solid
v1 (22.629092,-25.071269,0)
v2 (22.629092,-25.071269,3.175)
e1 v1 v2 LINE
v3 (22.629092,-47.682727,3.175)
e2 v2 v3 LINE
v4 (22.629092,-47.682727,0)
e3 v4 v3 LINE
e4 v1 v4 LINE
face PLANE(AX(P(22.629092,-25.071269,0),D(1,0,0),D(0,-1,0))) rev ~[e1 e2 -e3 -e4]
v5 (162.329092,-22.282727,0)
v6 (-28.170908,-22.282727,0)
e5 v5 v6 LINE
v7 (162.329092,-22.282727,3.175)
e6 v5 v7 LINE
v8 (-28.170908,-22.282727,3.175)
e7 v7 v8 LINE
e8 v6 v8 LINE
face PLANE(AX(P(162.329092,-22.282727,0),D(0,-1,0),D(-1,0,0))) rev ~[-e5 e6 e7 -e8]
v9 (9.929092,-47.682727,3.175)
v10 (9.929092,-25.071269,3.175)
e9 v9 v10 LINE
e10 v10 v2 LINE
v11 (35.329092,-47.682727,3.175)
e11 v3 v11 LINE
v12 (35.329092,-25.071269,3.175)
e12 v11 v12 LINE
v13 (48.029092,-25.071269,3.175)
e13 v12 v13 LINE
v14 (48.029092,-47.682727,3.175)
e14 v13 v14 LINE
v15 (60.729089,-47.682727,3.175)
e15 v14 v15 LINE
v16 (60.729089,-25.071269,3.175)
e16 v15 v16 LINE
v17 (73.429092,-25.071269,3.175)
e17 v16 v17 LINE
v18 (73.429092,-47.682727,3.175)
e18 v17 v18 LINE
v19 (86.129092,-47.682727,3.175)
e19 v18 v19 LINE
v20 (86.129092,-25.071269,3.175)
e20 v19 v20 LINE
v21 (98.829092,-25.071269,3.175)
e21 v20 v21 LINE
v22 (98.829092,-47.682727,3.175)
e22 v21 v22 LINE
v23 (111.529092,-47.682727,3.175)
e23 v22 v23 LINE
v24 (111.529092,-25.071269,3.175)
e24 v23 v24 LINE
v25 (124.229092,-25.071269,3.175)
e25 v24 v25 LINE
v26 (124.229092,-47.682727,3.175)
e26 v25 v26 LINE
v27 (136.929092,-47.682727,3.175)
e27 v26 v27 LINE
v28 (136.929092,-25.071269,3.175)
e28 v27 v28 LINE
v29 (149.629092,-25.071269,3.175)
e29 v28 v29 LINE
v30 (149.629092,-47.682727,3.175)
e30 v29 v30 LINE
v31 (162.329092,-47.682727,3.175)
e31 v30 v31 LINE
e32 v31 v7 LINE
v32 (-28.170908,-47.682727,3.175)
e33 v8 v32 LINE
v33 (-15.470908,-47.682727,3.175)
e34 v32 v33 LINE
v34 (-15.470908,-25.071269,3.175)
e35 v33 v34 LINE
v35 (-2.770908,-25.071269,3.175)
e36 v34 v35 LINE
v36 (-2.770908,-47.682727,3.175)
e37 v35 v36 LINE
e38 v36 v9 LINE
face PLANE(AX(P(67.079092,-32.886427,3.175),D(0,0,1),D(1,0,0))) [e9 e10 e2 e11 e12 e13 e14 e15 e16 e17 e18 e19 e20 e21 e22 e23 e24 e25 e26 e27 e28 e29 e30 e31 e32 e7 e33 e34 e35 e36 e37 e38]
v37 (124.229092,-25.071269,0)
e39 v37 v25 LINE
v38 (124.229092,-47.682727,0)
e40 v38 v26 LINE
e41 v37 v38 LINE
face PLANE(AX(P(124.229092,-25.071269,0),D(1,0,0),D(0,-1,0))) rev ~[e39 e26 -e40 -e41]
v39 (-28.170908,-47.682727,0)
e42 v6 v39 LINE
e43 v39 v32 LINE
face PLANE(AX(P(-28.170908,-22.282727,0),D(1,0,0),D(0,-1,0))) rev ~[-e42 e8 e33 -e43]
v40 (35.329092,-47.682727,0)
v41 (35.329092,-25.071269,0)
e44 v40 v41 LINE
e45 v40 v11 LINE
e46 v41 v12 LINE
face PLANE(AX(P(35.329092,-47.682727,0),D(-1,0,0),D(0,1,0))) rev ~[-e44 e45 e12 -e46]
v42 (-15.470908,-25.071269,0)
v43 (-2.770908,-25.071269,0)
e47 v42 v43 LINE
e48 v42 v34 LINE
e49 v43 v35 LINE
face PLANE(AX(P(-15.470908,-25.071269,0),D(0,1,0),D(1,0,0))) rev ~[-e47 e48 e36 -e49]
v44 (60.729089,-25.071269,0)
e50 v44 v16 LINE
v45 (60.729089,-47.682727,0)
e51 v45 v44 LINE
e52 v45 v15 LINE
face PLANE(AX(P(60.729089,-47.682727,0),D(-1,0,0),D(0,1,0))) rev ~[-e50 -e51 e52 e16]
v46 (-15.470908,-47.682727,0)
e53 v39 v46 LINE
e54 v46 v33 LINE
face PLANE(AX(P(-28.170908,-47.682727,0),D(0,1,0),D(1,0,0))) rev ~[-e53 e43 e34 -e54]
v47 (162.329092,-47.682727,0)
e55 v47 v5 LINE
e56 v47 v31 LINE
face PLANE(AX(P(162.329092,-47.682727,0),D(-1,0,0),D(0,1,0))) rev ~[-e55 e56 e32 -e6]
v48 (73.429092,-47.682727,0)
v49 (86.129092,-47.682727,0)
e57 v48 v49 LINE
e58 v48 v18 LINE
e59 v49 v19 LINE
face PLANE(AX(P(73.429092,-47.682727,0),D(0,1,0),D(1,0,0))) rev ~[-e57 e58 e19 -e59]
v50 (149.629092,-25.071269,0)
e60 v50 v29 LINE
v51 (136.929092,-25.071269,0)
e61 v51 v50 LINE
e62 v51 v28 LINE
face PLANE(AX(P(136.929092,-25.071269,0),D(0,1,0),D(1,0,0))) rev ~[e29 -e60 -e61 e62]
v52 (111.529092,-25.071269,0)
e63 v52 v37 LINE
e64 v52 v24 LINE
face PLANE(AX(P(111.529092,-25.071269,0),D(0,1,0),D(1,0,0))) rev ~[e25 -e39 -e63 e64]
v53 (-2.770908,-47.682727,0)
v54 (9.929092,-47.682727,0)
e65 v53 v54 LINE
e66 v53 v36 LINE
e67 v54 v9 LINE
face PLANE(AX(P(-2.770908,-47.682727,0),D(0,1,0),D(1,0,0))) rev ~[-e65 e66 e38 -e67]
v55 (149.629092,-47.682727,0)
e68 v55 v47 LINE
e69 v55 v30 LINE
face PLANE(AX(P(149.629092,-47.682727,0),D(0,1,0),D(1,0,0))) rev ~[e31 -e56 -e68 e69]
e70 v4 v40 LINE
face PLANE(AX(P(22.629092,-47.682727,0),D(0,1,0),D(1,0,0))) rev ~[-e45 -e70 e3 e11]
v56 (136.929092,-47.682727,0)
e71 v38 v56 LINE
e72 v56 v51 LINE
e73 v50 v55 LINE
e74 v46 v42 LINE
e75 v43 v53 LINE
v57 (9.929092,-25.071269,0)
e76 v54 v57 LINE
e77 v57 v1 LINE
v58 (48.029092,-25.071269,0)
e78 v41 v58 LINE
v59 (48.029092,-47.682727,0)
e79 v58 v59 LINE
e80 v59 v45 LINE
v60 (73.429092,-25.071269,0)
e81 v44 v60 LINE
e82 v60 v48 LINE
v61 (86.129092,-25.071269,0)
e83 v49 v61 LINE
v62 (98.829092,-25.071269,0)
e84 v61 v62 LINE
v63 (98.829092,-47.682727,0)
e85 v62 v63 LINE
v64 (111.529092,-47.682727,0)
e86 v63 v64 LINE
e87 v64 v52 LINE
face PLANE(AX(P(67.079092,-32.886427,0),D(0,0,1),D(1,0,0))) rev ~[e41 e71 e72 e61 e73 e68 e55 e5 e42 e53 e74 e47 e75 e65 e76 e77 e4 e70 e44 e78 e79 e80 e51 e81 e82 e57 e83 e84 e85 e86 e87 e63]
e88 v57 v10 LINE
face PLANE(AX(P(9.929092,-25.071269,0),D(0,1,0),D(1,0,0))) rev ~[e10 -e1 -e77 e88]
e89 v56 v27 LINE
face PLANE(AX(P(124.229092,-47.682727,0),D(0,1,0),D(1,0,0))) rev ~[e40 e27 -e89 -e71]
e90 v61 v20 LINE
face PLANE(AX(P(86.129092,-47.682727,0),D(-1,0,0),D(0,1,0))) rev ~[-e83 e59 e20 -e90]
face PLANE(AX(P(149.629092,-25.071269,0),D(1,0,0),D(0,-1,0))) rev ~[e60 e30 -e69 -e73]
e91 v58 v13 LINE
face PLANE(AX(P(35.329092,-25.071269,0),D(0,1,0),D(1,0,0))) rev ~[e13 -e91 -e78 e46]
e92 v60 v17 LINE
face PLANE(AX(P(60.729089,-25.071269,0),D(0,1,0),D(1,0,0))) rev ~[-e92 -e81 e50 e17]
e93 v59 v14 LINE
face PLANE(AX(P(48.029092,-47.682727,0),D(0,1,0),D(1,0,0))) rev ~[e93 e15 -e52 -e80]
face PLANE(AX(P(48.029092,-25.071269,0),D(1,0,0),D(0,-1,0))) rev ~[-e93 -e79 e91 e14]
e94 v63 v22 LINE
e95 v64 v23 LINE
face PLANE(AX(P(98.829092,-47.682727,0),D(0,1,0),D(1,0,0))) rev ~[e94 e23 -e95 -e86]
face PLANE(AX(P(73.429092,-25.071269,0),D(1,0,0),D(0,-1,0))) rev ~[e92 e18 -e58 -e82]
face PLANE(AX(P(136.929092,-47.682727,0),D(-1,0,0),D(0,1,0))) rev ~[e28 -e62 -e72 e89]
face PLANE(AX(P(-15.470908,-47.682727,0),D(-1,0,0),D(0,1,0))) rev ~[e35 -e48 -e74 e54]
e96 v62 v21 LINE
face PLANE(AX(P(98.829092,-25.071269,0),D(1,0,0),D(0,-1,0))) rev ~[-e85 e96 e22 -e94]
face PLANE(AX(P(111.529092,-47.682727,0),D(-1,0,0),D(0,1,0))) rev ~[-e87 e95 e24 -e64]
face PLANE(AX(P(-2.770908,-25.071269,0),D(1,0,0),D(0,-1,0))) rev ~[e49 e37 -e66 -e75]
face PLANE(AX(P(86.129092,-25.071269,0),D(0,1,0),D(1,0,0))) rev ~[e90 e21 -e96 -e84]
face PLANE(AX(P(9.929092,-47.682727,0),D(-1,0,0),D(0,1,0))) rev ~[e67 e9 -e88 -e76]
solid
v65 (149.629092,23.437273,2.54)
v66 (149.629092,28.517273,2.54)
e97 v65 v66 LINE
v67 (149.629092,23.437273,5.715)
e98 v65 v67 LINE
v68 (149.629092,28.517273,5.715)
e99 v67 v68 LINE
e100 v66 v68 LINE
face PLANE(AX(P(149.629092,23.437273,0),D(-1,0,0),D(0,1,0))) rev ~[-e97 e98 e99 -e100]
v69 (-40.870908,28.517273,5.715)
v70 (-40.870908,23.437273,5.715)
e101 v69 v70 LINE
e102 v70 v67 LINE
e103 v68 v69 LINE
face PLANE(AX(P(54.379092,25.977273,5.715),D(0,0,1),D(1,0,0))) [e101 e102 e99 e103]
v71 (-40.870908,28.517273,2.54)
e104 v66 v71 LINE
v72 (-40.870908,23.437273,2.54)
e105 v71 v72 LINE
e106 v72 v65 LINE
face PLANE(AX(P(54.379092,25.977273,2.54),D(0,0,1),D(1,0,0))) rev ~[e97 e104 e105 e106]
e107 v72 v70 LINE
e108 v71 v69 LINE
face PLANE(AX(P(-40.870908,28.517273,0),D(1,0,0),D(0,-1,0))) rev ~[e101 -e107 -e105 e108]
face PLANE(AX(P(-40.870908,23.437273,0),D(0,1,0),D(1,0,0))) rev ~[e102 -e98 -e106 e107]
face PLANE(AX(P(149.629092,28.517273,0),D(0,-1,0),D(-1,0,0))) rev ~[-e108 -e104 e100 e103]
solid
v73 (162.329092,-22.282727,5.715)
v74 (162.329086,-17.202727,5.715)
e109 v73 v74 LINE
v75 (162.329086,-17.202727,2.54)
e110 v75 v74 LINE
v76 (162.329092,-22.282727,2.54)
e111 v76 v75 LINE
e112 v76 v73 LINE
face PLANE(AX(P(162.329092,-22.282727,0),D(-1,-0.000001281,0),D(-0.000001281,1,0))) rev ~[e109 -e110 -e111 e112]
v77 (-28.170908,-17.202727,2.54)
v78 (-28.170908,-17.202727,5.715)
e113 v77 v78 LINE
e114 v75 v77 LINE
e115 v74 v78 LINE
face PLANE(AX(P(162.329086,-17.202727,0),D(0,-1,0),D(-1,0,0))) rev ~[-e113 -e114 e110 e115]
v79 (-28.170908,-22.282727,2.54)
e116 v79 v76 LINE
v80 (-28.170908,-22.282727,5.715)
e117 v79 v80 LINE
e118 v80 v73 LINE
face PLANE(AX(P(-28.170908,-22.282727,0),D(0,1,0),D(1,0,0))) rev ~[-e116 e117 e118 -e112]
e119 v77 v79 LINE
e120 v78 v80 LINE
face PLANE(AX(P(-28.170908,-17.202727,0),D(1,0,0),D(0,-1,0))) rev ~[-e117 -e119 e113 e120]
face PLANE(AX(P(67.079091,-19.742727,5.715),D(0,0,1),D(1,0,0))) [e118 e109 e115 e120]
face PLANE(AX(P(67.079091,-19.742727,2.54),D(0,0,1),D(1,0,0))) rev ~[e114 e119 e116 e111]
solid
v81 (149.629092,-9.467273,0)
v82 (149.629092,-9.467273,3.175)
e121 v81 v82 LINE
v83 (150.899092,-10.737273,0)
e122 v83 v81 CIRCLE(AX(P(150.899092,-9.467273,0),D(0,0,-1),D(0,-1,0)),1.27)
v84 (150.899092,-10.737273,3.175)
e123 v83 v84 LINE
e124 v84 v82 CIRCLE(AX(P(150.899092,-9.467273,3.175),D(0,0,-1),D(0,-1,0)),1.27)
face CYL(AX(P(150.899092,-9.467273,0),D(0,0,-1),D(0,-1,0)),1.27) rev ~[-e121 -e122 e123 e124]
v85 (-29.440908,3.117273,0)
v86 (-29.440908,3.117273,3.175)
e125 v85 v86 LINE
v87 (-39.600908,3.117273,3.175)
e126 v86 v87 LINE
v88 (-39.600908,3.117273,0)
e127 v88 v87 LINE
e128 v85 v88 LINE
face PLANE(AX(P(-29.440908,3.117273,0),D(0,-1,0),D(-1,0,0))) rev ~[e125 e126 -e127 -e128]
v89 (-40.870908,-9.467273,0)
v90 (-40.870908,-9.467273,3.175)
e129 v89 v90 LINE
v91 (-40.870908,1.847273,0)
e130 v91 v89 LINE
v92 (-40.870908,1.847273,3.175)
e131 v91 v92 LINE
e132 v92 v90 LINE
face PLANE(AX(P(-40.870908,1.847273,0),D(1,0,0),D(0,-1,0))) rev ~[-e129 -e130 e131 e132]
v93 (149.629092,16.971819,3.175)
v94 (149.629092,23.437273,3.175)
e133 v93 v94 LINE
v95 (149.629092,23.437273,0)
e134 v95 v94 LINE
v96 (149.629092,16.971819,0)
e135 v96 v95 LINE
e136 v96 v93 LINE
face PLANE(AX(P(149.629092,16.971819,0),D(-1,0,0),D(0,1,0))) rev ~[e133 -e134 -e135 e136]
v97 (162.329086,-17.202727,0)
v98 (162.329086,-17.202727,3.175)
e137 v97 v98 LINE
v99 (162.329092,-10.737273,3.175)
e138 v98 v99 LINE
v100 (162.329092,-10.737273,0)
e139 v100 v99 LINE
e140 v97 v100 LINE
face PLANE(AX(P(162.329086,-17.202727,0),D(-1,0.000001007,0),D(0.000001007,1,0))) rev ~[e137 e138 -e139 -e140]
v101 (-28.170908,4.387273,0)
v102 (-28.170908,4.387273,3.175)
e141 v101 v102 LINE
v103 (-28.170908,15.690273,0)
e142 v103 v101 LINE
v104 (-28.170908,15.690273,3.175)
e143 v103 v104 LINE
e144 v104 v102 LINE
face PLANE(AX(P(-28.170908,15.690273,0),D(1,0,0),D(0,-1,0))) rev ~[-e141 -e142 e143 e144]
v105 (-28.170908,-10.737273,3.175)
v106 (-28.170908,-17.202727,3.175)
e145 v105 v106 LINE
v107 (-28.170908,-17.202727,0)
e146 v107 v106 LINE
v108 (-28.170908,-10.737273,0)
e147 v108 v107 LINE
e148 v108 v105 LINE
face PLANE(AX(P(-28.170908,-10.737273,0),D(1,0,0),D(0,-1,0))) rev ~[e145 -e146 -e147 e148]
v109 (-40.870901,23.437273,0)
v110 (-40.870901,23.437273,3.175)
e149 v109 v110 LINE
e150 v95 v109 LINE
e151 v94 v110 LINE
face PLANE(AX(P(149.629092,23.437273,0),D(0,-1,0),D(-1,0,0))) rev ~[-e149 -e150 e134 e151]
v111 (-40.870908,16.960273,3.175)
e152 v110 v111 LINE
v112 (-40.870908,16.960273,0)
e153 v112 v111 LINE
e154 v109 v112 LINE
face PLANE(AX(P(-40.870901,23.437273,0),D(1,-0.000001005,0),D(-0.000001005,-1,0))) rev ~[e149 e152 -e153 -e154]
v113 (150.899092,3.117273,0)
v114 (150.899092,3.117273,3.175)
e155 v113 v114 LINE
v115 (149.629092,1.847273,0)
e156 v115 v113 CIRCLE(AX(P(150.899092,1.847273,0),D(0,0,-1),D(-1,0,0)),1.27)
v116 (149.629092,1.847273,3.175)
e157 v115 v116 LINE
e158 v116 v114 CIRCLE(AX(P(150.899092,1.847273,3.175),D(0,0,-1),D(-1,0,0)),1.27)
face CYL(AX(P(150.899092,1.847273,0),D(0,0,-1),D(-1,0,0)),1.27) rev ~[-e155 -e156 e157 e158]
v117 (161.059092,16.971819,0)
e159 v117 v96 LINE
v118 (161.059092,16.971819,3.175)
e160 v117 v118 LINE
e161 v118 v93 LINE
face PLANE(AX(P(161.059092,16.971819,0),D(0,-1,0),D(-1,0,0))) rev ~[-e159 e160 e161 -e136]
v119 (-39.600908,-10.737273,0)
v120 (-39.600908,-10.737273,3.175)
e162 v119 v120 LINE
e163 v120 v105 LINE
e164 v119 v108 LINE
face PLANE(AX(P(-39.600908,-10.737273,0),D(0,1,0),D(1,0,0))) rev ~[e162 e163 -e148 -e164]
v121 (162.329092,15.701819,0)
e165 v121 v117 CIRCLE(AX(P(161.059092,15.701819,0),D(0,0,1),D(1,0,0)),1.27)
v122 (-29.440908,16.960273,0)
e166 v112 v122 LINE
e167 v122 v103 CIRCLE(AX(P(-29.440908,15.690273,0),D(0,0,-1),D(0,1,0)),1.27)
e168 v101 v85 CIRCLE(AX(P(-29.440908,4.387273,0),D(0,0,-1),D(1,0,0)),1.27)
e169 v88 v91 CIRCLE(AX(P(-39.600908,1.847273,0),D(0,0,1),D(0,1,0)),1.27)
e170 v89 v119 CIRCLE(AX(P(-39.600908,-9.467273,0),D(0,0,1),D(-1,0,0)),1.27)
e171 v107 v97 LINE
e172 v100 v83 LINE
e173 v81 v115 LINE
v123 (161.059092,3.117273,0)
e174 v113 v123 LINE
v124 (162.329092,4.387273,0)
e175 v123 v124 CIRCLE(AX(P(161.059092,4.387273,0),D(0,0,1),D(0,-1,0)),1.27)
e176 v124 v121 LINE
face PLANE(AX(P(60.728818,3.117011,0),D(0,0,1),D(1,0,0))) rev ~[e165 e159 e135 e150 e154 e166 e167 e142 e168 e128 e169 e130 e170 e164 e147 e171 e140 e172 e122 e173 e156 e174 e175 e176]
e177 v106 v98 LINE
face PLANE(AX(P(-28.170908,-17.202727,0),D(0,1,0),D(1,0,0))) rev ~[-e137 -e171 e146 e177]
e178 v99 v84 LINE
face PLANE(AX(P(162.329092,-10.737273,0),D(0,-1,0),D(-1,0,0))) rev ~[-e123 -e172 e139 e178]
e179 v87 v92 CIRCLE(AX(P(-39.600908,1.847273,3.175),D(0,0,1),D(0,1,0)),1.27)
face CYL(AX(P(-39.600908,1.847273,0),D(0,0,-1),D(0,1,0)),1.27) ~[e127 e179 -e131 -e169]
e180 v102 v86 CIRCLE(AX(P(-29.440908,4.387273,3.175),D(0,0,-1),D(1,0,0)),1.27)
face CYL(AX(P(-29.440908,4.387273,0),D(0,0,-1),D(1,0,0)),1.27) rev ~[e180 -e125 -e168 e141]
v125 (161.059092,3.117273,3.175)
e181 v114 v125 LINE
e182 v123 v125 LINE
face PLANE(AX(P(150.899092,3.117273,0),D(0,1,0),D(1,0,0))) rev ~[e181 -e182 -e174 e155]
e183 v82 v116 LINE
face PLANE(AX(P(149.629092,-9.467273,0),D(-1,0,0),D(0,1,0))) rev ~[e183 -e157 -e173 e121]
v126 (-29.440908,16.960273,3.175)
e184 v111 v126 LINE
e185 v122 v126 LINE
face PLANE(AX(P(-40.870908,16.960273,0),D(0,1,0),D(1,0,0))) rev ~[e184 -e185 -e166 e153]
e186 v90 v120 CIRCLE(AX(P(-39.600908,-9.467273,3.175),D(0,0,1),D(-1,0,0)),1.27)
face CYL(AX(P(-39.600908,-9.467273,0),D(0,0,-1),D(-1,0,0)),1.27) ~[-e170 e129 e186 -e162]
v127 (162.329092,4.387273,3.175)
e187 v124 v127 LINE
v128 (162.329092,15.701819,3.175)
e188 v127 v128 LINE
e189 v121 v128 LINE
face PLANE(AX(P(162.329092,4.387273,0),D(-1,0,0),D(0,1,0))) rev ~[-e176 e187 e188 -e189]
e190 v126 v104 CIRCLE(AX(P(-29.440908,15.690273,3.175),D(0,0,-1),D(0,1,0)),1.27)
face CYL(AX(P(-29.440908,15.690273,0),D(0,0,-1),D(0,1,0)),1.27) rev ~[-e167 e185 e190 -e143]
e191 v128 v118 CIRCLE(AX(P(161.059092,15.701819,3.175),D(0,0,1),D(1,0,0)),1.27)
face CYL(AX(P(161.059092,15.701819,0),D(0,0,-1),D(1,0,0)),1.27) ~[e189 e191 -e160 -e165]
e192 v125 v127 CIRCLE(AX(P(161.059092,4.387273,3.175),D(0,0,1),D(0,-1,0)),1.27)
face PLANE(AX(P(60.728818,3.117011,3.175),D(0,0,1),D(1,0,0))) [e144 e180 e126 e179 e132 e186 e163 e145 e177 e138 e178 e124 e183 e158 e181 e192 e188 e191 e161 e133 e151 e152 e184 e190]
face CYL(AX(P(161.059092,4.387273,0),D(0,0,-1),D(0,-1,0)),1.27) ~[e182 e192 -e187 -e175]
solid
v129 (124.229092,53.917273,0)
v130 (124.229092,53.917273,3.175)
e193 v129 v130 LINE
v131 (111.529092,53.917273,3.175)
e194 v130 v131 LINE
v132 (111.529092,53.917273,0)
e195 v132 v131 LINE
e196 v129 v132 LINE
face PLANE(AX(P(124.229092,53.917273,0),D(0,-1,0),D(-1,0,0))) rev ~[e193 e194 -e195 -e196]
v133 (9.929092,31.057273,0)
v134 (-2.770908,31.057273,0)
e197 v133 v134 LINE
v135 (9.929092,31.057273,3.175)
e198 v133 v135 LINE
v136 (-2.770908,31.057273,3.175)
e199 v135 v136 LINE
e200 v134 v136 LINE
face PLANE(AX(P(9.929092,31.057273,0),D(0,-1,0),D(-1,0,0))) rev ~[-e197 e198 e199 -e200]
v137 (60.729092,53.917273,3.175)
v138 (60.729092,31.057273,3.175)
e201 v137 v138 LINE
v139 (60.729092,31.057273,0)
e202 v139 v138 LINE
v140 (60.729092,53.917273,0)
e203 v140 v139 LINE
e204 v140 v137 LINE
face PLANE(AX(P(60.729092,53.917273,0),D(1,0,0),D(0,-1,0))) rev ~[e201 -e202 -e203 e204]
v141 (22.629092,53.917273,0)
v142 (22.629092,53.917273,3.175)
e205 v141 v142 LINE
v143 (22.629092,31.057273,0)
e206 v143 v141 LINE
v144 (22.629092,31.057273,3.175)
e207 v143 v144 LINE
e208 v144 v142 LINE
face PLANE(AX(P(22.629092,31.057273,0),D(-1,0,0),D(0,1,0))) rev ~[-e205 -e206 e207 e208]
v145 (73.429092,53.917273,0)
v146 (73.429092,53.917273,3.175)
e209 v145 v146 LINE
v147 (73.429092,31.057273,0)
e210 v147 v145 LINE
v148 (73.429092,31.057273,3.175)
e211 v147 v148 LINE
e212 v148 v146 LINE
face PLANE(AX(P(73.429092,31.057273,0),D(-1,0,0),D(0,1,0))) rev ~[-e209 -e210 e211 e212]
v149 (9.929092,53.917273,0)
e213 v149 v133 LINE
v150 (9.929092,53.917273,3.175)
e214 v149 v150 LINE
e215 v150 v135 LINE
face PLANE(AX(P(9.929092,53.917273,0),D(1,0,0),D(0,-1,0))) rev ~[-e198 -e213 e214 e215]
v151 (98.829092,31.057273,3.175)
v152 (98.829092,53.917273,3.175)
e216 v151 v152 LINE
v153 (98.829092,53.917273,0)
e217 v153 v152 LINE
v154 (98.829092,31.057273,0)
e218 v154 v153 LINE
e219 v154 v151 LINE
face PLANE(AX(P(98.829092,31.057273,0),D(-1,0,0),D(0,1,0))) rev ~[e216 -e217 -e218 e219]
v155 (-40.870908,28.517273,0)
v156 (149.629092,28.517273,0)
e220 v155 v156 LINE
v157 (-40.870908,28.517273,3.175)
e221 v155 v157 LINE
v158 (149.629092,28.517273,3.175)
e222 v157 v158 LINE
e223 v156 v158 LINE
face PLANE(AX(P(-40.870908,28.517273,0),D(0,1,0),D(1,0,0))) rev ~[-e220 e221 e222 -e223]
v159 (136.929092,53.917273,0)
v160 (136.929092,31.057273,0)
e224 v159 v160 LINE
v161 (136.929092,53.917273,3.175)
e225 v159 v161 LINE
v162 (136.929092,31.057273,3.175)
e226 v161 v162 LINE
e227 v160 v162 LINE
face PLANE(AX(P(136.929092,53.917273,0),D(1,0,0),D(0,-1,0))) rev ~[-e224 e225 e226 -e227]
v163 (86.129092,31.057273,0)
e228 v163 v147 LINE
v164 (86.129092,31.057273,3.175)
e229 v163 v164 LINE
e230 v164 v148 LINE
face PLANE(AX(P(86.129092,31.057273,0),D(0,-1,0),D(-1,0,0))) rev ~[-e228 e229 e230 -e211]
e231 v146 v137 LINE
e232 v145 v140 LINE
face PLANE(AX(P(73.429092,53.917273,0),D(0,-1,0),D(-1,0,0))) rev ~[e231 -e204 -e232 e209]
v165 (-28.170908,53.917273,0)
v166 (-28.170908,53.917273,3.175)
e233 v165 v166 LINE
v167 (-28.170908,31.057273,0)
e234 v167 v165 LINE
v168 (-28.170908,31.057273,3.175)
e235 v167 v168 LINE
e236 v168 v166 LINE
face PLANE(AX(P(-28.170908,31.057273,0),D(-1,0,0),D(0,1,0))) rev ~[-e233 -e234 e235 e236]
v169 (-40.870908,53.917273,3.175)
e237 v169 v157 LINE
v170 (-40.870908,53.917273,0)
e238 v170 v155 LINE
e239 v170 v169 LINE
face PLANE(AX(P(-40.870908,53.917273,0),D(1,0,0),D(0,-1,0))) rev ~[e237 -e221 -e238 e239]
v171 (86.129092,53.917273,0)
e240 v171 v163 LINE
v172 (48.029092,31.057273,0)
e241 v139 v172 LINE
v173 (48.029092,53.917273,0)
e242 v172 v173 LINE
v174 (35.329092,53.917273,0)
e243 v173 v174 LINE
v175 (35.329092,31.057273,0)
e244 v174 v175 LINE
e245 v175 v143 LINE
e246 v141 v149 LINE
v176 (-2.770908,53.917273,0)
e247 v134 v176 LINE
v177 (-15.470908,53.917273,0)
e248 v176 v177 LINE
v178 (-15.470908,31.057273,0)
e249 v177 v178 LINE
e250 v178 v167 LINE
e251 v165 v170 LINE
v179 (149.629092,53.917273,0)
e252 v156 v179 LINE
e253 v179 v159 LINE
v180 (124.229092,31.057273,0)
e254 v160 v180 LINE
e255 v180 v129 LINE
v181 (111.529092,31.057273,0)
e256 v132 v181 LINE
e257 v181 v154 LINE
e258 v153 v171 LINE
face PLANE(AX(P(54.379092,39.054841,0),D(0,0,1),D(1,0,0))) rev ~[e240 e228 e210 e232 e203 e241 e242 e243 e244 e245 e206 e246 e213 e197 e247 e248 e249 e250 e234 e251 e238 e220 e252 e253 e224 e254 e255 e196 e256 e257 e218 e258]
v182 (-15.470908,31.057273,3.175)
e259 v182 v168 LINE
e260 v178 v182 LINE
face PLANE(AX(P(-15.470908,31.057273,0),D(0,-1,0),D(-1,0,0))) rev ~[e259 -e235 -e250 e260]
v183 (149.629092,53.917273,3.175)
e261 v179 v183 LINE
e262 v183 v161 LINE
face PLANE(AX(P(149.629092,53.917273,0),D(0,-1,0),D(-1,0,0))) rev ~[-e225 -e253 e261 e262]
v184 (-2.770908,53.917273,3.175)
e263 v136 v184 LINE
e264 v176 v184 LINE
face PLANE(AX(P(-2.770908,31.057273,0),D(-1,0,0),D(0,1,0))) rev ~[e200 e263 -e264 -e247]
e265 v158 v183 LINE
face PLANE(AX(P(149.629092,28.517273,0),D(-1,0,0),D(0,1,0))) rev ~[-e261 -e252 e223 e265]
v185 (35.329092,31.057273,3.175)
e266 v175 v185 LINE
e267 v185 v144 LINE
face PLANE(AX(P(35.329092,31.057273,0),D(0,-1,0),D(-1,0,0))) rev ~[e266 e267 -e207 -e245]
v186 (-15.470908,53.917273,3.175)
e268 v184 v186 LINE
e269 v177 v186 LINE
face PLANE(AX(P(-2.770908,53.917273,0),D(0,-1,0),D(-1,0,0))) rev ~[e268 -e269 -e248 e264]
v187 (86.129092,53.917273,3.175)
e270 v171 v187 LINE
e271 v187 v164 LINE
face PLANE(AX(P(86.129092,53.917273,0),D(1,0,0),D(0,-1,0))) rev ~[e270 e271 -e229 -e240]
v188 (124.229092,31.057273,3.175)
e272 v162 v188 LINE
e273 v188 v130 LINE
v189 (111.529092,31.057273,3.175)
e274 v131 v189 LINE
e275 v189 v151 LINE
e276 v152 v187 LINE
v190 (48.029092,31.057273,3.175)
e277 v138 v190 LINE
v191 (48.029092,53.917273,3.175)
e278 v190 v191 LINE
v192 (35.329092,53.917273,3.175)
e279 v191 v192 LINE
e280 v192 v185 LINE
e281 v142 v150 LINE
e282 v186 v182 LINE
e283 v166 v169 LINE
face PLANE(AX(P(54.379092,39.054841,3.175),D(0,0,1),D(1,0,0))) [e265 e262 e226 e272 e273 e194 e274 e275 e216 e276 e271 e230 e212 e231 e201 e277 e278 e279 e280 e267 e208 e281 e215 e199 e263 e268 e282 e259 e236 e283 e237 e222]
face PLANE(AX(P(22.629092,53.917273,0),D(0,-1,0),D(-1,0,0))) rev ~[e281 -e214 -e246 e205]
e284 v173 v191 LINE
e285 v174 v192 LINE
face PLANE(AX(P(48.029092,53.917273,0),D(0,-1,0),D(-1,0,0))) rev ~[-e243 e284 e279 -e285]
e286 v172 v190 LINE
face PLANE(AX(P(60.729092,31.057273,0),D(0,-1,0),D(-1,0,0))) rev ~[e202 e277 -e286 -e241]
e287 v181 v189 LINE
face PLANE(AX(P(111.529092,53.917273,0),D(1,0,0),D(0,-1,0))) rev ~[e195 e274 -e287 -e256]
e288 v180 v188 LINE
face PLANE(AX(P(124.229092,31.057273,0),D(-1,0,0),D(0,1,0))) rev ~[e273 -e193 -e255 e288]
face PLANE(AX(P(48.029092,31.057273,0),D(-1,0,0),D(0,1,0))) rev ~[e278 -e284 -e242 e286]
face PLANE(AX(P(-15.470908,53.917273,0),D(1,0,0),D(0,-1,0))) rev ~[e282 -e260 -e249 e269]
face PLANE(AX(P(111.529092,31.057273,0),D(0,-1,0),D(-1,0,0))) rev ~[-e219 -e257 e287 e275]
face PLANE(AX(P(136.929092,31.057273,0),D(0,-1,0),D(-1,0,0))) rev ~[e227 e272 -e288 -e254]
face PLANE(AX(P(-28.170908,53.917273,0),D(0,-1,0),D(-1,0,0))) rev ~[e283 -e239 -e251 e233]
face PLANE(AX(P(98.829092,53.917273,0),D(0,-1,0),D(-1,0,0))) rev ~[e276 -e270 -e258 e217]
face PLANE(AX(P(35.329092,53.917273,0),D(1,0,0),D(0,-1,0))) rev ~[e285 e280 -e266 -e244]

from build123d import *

# Parameters (mm, degrees)
F1_DEPTH = 3.175
F2_DEPTH = 5.715
F3_DEPTH = 2.54


# Not quite as in the source:
# - ends of sketch curves that miss each other by under 0.0002 mm in the source are joined


with BuildPart() as f1:
    # F0 (on Top) → F1 (new body)
    with BuildSketch(Plane.XY):
        Polygon((-15.470907706, -22.2827270627), (-28.170907706, -22.2827270627), (-28.170907706, -25.0712689012), (-28.170907706, -47.6827270627), (-15.470907706, -47.6827270627), (-15.470907706, -25.0712689012), (-2.770907706, -25.0712689012), (-2.770907706, -47.6827270627), (9.929092294, -47.6827270627), (9.929092294, -25.0712689012), (22.629092294, -25.0712689012), (22.629092294, -47.6827270627), (35.329092294, -47.6827270627), (35.329092294, -25.0712689012), (48.029092294, -25.0712689012), (48.029092294, -47.6827270627), (60.7290890396, -47.6827270627), (60.7290890396, -25.0712689012), (73.429092294, -25.0712689012), (73.429092294, -47.6827270627), (86.129092294, -47.6827270627), (86.129092294, -25.0712689012), (98.829092294, -25.0712689012), (98.829092294, -47.6827270627), (111.529092294, -47.6827270627), (111.529092294, -25.0712689012), (124.229092294, -25.0712689012), (124.229092294, -47.6827270627), (136.929092294, -47.6827270627), (136.929092294, -25.0712689012), (149.629092294, -25.0712689012), (149.629092294, -47.6827270627), (162.329092294, -47.6827270627), (162.329092294, -22.2827270627), (149.629092294, -22.2827270627), (136.929092294, -22.2827270627), (124.229092294, -22.2827270627), (111.529092294, -22.2827270627), (98.829092294, -22.2827270627), (86.129092294, -22.2827270627), (73.429092294, -22.2827270627), (60.729092294, -22.2827270627), (48.029092294, -22.2827270627), (35.329092294, -22.2827270627), (22.629092294, -22.2827270627), (9.929092294, -22.2827270627), (-2.770907706, -22.2827270627), align=None)
    extrude(amount=F1_DEPTH)


with BuildPart() as f1b:
    # F0 (on Top) → F1, piece 2 (new body)
    with BuildSketch(Plane.XY):
        Polygon((-40.870907706, 31.0572729373), (-40.870907706, 28.5172729373), (-28.170907706, 28.5172729373), (-15.470907706, 28.5172729373), (-2.770907706, 28.5172729373), (9.929092294, 28.5172729373), (22.629092294, 28.5172729373), (35.329092294, 28.5172729373), (48.029092294, 28.5172729373), (60.729092294, 28.5172729373), (73.429092294, 28.5172729373), (86.129092294, 28.5172729373), (98.829092294, 28.5172729373), (111.529092294, 28.5172729373), (124.229092294, 28.5172729373), (136.929092294, 28.5172729373), (149.629092294, 28.5172729373), (149.629092294, 31.0572729373), (149.629092294, 53.9172729373), (136.929092294, 53.9172729373), (136.929092294, 31.0572729373), (124.229092294, 31.0572729373), (124.229092294, 53.9172729373), (111.529092294, 53.9172729373), (111.529092294, 31.0572729373), (98.829092294, 31.0572729373), (98.829092294, 53.9172729373), (86.129092294, 53.9172729373), (86.129092294, 31.0572729373), (73.429092294, 31.0572729373), (73.429092294, 53.9172729373), (60.729092294, 53.9172729373), (60.729092294, 31.0572729373), (48.029092294, 31.0572729373), (48.029092294, 53.9172729373), (35.329092294, 53.9172729373), (35.329092294, 31.0572729373), (22.629092294, 31.0572729373), (22.629092294, 53.9172729373), (9.929092294, 53.9172729373), (9.929092294, 31.0572729373), (-2.770907706, 31.0572729373), (-2.770907706, 53.9172729373), (-15.470907706, 53.9172729373), (-15.470907706, 31.0572729373), (-28.170907706, 31.0572729373), (-28.170907706, 53.9172729373), (-40.870907706, 53.9172729373), align=None)
    extrude(amount=F1_DEPTH)


with BuildPart() as f1c:
    # F0 (on Top) → F1, piece 3 (new body)
    with BuildSketch(Plane.XY):
        with BuildLine():
            Line((149.629092294, 23.4372729373), (-40.8709011972, 23.4372729373))
            Line((-40.8709011972, 23.4372729373), (-40.870907706, 16.9602729373))
            Line((-40.870907706, 16.9602729373), (-29.440907706, 16.9602729373))
            ThreePointArc((-29.440907706, 16.9602729373), (-28.5428820939, 16.5882985494), (-28.170907706, 15.6902729373))
            Line((-28.170907706, 15.6902729373), (-28.170907706, 4.3872729373))
            ThreePointArc((-28.170907706, 4.3872729373), (-28.5428820939, 3.4892473252), (-29.440907706, 3.1172729373))
            Line((-29.440907706, 3.1172729373), (-39.600907706, 3.1172729373))
            ThreePointArc((-39.600907706, 3.1172729373), (-40.4989333181, 2.7452985494), (-40.870907706, 1.8472729373))
            Line((-40.870907706, 1.8472729373), (-40.870907706, -9.4672727573))
            ThreePointArc((-40.870907706, -9.4672727573), (-40.4989333181, -10.3652983694), (-39.600907706, -10.7372727573))
            Line((-39.600907706, -10.7372727573), (-28.170907706, -10.7372727573))
            Line((-28.170907706, -10.7372727573), (-28.170907706, -17.2027270627))
            Line((-28.170907706, -17.2027270627), (162.3290857852, -17.2027270627))
            Line((162.3290857852, -17.2027270627), (162.329092294, -10.7372727573))
            Line((162.329092294, -10.7372727573), (150.899092294, -10.7372727573))
            ThreePointArc((150.899092294, -10.7372727573), (150.0010666819, -10.3652983694), (149.629092294, -9.4672727573))
            Line((149.629092294, -9.4672727573), (149.629092294, 1.8472729373))
            ThreePointArc((149.629092294, 1.8472729373), (150.0010666819, 2.7452985494), (150.899092294, 3.1172729373))
            Line((150.899092294, 3.1172729373), (161.059092294, 3.1172729373))
            ThreePointArc((161.059092294, 3.1172729373), (161.9571179061, 3.4892473252), (162.329092294, 4.3872729373))
            Line((162.329092294, 4.3872729373), (162.329092294, 15.7018186319))
            ThreePointArc((162.329092294, 15.7018186319), (161.9571179061, 16.599844244), (161.059092294, 16.9718186319))
            Line((161.059092294, 16.9718186319), (149.629092294, 16.9718186319))
            Line((149.629092294, 16.9718186319), (149.629092294, 23.4372729373))
        make_face()
    extrude(amount=F1_DEPTH)


with BuildPart() as f2:
    # F0 (on Top) → F2 (new body)
    with BuildSketch(Plane.XY):
        Polygon((-28.170907706, 28.5172729373), (-40.870907706, 28.5172729373), (-40.870907706, 23.4372729373), (149.629092294, 23.4372729373), (149.629092294, 28.5172729373), (136.929092294, 28.5172729373), (124.229092294, 28.5172729373), (111.529092294, 28.5172729373), (98.829092294, 28.5172729373), (86.129092294, 28.5172729373), (73.429092294, 28.5172729373), (60.729092294, 28.5172729373), (48.029092294, 28.5172729373), (35.329092294, 28.5172729373), (22.629092294, 28.5172729373), (9.929092294, 28.5172729373), (-2.770907706, 28.5172729373), (-15.470907706, 28.5172729373), align=None)
    extrude(amount=F2_DEPTH)


with BuildPart() as f2b:
    # F0 (on Top) → F2, piece 2 (new body)
    with BuildSketch(Plane.XY):
        Polygon((162.3290857852, -17.2027270627), (-28.170907706, -17.2027270627), (-28.170907706, -22.2827270627), (-15.470907706, -22.2827270627), (-2.770907706, -22.2827270627), (9.929092294, -22.2827270627), (22.629092294, -22.2827270627), (35.329092294, -22.2827270627), (48.029092294, -22.2827270627), (60.729092294, -22.2827270627), (73.429092294, -22.2827270627), (86.129092294, -22.2827270627), (98.829092294, -22.2827270627), (111.529092294, -22.2827270627), (124.229092294, -22.2827270627), (136.929092294, -22.2827270627), (149.629092294, -22.2827270627), (162.329092294, -22.2827270627), align=None)
    extrude(amount=F2_DEPTH)


with BuildPart() as f3_tool:
    # F0 (on Top) → F3 (new body)
    with BuildSketch(Plane.XY):
        Polygon((-28.170907706, 28.5172729373), (-40.870907706, 28.5172729373), (-40.870907706, 23.4372729373), (149.629092294, 23.4372729373), (149.629092294, 28.5172729373), (136.929092294, 28.5172729373), (124.229092294, 28.5172729373), (111.529092294, 28.5172729373), (98.829092294, 28.5172729373), (86.129092294, 28.5172729373), (73.429092294, 28.5172729373), (60.729092294, 28.5172729373), (48.029092294, 28.5172729373), (35.329092294, 28.5172729373), (22.629092294, 28.5172729373), (9.929092294, 28.5172729373), (-2.770907706, 28.5172729373), (-15.470907706, 28.5172729373), align=None)
        Polygon((162.3290857852, -17.2027270627), (-28.170907706, -17.2027270627), (-28.170907706, -22.2827270627), (-15.470907706, -22.2827270627), (-2.770907706, -22.2827270627), (9.929092294, -22.2827270627), (22.629092294, -22.2827270627), (35.329092294, -22.2827270627), (48.029092294, -22.2827270627), (60.729092294, -22.2827270627), (73.429092294, -22.2827270627), (86.129092294, -22.2827270627), (98.829092294, -22.2827270627), (111.529092294, -22.2827270627), (124.229092294, -22.2827270627), (136.929092294, -22.2827270627), (149.629092294, -22.2827270627), (162.329092294, -22.2827270627), align=None)
    extrude(amount=F3_DEPTH)


with BuildPart() as f2_1:
    add(f2.part)

    # F3: cut by f3_tool
    add(f3_tool.part, mode=Mode.SUBTRACT)


with BuildPart() as f2b_1:
    add(f2b.part)

    # F3: cut by f3_tool
    add(f3_tool.part, mode=Mode.SUBTRACT)


solid = Compound([f1.part, f1b.part, f1c.part, f2_1.part, f2b_1.part])
